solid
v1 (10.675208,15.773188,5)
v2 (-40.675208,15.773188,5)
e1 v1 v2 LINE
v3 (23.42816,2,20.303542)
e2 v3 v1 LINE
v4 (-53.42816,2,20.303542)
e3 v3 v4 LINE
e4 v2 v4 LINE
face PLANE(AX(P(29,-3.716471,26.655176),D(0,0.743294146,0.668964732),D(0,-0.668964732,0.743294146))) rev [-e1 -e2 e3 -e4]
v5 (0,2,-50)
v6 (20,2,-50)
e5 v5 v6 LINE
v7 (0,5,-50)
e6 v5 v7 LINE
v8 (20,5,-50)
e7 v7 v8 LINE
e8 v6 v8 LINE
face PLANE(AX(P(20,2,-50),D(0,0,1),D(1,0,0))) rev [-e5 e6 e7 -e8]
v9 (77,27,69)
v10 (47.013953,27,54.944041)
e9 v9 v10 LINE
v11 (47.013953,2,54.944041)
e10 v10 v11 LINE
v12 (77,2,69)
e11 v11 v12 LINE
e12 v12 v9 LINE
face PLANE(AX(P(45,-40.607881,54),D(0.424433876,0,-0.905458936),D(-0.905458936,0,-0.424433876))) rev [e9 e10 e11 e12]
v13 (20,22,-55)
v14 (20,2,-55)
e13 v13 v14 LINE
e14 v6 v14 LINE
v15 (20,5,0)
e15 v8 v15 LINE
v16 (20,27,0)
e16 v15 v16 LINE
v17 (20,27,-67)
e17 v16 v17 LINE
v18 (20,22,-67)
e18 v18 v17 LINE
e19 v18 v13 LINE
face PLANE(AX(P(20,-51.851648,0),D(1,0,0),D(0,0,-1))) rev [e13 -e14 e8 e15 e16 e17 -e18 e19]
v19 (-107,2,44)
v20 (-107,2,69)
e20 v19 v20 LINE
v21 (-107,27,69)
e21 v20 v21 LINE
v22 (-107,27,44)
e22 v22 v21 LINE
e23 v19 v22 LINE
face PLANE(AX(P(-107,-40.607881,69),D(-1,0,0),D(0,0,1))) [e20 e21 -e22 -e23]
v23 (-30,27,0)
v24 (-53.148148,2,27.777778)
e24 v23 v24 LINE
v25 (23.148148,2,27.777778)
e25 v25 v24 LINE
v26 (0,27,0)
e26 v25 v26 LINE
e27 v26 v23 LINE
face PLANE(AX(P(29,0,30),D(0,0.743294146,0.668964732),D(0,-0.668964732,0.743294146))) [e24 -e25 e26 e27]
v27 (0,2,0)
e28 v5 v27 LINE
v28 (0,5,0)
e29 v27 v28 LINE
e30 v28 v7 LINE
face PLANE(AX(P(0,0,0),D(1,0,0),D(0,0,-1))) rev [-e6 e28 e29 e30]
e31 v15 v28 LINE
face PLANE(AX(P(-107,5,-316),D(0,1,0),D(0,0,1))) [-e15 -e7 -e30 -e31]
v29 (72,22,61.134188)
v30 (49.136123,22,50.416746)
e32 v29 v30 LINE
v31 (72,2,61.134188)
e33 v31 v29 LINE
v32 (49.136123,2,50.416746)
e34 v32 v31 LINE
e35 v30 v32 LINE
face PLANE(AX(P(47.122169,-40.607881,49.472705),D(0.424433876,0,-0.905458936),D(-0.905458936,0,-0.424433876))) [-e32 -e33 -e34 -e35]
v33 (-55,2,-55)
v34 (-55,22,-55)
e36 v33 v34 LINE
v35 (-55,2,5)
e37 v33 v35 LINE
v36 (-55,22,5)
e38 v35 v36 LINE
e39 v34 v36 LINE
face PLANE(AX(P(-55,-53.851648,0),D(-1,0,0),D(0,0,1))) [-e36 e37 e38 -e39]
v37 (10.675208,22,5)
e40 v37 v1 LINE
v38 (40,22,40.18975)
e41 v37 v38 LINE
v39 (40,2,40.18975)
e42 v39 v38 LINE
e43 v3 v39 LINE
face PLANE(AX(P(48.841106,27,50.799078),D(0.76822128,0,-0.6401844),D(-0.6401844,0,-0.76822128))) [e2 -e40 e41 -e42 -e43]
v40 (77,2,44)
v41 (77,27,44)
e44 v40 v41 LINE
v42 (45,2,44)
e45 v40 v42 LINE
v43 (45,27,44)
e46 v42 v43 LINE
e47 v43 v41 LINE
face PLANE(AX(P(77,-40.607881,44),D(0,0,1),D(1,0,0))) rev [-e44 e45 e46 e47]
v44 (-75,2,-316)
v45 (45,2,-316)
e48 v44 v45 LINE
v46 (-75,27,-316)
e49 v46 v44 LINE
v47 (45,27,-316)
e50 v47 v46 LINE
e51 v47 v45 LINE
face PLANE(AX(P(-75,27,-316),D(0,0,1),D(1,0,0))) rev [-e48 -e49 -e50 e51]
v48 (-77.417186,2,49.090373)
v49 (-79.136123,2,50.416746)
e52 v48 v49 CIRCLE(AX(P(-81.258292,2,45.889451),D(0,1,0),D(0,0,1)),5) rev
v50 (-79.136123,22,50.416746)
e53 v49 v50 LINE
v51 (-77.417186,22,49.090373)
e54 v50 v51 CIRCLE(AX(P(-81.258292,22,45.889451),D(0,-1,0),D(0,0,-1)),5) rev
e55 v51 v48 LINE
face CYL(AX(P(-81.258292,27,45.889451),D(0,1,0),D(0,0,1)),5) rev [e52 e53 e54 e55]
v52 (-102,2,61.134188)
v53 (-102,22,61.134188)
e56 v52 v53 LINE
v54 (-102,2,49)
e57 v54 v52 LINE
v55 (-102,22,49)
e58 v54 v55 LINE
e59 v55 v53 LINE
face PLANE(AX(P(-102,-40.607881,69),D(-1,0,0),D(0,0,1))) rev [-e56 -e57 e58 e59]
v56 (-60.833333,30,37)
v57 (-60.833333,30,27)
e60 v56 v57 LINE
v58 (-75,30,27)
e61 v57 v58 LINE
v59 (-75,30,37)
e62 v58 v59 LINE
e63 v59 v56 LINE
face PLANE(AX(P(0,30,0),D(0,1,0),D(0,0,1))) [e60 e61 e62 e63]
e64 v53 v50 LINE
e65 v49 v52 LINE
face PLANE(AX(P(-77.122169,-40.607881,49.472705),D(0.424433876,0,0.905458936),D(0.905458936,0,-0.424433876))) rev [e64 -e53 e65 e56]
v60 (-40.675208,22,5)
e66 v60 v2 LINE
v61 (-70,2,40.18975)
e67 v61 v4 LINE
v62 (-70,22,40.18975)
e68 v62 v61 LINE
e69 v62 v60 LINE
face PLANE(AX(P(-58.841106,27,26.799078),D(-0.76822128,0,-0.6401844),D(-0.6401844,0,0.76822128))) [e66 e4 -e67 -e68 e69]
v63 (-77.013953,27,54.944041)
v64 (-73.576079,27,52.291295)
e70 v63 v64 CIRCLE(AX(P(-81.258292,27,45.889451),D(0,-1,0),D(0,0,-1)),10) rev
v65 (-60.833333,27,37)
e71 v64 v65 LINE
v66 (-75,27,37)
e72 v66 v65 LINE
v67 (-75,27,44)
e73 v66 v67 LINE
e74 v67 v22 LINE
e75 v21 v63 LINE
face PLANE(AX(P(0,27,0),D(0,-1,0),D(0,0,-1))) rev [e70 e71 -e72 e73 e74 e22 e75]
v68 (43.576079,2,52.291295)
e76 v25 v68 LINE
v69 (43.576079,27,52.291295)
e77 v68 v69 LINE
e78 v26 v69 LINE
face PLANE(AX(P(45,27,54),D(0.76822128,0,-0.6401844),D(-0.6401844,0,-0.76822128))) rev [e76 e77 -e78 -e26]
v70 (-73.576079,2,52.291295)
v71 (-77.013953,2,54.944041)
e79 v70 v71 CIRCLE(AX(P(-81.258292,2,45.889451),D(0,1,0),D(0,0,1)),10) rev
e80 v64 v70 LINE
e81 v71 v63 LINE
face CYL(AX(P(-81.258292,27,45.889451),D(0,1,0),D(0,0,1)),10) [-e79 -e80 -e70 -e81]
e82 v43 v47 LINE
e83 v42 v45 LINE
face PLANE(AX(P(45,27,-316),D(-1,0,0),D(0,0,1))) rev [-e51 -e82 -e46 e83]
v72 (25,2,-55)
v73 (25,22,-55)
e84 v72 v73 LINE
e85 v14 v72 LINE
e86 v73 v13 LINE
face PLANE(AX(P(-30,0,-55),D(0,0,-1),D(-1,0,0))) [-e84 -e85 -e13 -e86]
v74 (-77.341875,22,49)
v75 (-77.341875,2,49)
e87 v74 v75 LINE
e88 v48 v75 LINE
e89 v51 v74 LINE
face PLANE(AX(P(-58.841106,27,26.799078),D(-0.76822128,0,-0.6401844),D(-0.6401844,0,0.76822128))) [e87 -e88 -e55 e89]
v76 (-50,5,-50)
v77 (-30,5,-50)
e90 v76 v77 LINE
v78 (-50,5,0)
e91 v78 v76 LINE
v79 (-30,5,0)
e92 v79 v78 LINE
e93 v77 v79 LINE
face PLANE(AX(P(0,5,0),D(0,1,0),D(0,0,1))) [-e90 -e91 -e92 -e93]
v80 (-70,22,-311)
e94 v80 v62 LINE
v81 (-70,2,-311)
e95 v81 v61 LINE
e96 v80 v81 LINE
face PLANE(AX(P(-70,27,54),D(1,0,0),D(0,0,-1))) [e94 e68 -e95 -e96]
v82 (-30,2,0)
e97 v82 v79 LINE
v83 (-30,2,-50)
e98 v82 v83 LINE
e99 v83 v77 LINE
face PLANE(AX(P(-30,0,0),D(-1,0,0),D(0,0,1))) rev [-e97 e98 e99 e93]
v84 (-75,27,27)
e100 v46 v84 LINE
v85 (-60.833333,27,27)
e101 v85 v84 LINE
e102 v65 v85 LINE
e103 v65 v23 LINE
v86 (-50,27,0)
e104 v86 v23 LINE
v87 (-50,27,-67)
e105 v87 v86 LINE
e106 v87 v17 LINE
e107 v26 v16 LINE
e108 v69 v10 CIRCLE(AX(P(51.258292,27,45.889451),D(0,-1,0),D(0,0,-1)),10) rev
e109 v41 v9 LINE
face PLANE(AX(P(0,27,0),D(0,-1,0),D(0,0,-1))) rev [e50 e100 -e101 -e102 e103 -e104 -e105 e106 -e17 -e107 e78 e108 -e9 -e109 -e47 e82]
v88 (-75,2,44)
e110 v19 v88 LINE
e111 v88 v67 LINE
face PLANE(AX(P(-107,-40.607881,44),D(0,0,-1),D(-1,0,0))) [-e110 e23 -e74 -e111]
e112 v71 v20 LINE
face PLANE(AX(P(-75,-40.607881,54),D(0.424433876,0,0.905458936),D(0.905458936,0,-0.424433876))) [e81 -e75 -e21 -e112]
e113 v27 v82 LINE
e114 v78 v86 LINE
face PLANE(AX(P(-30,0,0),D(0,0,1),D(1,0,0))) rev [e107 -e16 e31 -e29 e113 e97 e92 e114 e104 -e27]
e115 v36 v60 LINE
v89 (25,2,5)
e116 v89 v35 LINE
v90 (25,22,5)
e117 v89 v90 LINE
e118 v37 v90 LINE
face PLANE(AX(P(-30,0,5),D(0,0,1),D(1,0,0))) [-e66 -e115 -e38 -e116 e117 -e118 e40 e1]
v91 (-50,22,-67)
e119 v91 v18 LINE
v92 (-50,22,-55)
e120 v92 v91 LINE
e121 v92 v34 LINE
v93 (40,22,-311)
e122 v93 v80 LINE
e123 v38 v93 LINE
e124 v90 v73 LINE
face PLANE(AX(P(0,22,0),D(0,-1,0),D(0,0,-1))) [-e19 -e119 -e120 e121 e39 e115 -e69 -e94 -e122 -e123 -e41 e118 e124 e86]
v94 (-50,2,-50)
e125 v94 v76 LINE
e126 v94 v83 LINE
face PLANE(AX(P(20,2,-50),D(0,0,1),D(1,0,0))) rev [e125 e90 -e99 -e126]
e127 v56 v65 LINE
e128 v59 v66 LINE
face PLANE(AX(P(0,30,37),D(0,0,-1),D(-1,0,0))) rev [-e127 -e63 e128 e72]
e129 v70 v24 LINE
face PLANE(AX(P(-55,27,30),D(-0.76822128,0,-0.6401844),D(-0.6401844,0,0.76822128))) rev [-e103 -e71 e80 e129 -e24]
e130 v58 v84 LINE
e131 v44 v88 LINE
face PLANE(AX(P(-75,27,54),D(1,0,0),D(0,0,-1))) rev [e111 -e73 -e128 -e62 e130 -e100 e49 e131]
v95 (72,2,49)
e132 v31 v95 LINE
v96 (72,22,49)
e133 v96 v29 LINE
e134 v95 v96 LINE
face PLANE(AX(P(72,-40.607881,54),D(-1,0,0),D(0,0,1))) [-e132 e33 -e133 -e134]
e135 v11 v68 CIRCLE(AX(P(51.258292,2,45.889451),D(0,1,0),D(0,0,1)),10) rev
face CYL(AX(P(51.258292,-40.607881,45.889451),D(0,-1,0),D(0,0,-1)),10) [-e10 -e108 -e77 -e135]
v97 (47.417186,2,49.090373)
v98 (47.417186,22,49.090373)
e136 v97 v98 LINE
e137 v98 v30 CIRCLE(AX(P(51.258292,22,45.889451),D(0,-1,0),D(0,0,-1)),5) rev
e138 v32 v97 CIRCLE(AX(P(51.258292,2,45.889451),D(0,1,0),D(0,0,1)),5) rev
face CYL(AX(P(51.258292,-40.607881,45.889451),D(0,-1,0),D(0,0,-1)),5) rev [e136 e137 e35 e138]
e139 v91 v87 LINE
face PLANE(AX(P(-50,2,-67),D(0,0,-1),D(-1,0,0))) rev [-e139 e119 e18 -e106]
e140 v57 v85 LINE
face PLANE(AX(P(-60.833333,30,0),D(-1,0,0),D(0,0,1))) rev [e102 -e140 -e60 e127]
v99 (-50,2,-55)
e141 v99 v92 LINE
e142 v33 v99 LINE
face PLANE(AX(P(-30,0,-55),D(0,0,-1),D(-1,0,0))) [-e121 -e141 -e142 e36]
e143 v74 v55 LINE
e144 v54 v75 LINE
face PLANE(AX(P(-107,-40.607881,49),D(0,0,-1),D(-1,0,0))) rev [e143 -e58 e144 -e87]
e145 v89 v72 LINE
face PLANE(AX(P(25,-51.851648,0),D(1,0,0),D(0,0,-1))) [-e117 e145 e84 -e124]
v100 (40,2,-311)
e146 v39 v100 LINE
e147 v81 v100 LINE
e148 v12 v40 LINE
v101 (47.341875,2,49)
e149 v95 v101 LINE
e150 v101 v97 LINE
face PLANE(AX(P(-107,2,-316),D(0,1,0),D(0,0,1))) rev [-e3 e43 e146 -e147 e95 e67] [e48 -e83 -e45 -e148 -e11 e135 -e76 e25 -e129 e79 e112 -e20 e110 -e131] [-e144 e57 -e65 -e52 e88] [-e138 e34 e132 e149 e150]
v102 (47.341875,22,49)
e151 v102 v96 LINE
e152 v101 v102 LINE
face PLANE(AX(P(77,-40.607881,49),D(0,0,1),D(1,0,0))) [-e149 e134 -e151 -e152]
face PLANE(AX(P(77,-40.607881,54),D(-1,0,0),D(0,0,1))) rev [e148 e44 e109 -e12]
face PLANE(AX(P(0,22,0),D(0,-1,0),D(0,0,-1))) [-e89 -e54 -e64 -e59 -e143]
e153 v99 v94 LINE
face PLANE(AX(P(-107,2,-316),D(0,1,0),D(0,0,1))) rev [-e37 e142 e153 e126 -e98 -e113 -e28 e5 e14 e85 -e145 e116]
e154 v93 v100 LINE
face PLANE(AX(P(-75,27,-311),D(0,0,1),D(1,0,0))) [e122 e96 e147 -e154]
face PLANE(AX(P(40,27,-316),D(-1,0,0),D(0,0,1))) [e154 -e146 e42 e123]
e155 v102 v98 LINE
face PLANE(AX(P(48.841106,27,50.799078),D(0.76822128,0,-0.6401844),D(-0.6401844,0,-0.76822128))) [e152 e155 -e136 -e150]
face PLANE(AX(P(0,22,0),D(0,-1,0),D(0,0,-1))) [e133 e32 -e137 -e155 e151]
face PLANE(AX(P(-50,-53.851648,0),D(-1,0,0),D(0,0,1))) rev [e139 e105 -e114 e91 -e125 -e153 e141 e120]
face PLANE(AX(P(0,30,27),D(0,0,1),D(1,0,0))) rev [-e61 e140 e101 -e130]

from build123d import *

# Parameters (mm, degrees)
BOSS_EXTRUDE1_DEPTH      = 27
CUT_EXTRUDE1_DEPTH       = 29
CUT_EXTRUDE1_DEPTH_BACK  = 70
BOSS_EXTRUDE2_DEPTH      = 27
SKETCH9_W                = 14.166666667
SKETCH9_H                = 10
BOSS_EXTRUDE3_DEPTH      = 3
SKETCH10_W               = 30
SKETCH10_H               = 50
CUT_EXTRUDE7_DEPTH       = 326.898757285
SKETCH11_W               = 20
SKETCH11_H               = 50
CUT_EXTRUDE9_DEPTH       = 22
BOSS_EXTRUDE4_DEPTH      = 27
FILLET1_R                = 10
FILLET2_R                = 10
CUT_EXTRUDE10_DEPTH      = 367.89508037
CUT_EXTRUDE10_DEPTH_BACK = 367.89508037
SKETCH17_W               = 385
SKETCH17_H               = 2
SKETCH18_W               = 20
SKETCH18_H               = 50
CUT_EXTRUDE11_DEPTH      = 22
SHELL1_START             = 2
SHELL1_DEPTH             = 20
SHELL1_START_2           = -55
SHELL1_2_DEPTH           = 80
CUT_EXTRUDE12_DEPTH      = 335.559411764
CUT_EXTRUDE12_DEPTH_BACK = 335.559411764
SKETCH20_W               = 70
SKETCH20_H               = 17


with BuildPart() as part:
    # Sketch1 → Boss-Extrude1 (new body)
    with BuildSketch(Plane(origin=(0, 0, 0), x_dir=(1, 0, 0), z_dir=(0, 1, 0))):
        Polygon((-30, 0), (-55, -30), (-15, -30), (-15, 0), align=None)
        Polygon((-15, 0), (-15, -30), (25, -30), (0, 0), align=None)
    extrude(amount=BOSS_EXTRUDE1_DEPTH)

    # Sketch3 → Cut-Extrude1 (cut, two sides: drawn at the far end of the back side and taken through both)
    with BuildSketch(Plane(origin=(0, 0, 0), x_dir=(0, 0, -1), z_dir=(1, 0, 0)).offset(-CUT_EXTRUDE1_DEPTH_BACK)):
        Polygon((-30, 0), (0, 27), (-30, 27), align=None)
    extrude(amount=CUT_EXTRUDE1_DEPTH + CUT_EXTRUDE1_DEPTH_BACK, mode=Mode.SUBTRACT)

    # Sketch5 → Boss-Extrude2 (add)
    with BuildSketch(Plane(origin=(0, 0, 0), x_dir=(1, 0, 0), z_dir=(0, 1, 0))):
        Polygon((-55, -30), (-75, -54), (-75, 316), (45, 316), (45, -54), (25, -30), (0, 0), (-30, 0), align=None)
    extrude(amount=BOSS_EXTRUDE2_DEPTH)

    # Sketch9 → Boss-Extrude3 (add)
    with BuildSketch(Plane(origin=(0, 27, 0), x_dir=(1, 0, 0), z_dir=(0, 1, 0))):
        with Locations((-67.916666667, -32)):
            Rectangle(SKETCH9_W, SKETCH9_H)
    extrude(amount=BOSS_EXTRUDE3_DEPTH)

    # Sketch10 → Cut-Extrude7 (cut, through all)
    with BuildSketch(Plane(origin=(0, 27, 0), x_dir=(1, 0, 0), z_dir=(0, 1, 0))):
        with Locations((-15, 25)):
            Rectangle(SKETCH10_W, SKETCH10_H)
    extrude(amount=-CUT_EXTRUDE7_DEPTH, mode=Mode.SUBTRACT)

    # Sketch11 → Cut-Extrude9 (cut)
    with BuildSketch(Plane(origin=(0, 27, 0), x_dir=(1, 0, 0), z_dir=(0, 1, 0))):
        with Locations((-40, 25)):
            Rectangle(SKETCH11_W, SKETCH11_H)
    extrude(amount=-CUT_EXTRUDE9_DEPTH, mode=Mode.SUBTRACT)

    # Sketch16 → Boss-Extrude4 (add)
    with BuildSketch(Plane(origin=(0, 27, 0), x_dir=(1, 0, 0), z_dir=(0, 1, 0))):
        Polygon((-75, -54), (-107, -69), (-107, -54), (-107, -44), (-75, -44), align=None)
    boss_extrude4 = extrude(amount=-BOSS_EXTRUDE4_DEPTH)

    # Mirror1: Boss-Extrude4 across plane
    add(boss_extrude4.mirror(Plane.ZY.offset(15)))

    # Fillet1
    fillet1_edges = [part.edges().sort_by_distance(p)[0] for p in [
        (-75, 13.5, 54),
    ]]
    fillet(fillet1_edges, radius=FILLET1_R)

    # Fillet2
    fillet2_edges = [part.edges().sort_by_distance(p)[0] for p in [
        (45, 13.5, 54),
    ]]
    fillet(fillet2_edges, radius=FILLET2_R)

    # Sketch17 → Cut-Extrude10 (cut, two sides: drawn at the far end of the back side and taken through both)
    with BuildSketch(Plane(origin=(77, 0, 0), x_dir=(0, 0, -1), z_dir=(1, 0, 0)).offset(-CUT_EXTRUDE10_DEPTH_BACK)):
        with Locations((123.5, 1)):
            Rectangle(SKETCH17_W, SKETCH17_H)
    extrude(amount=CUT_EXTRUDE10_DEPTH + CUT_EXTRUDE10_DEPTH_BACK, mode=Mode.SUBTRACT)

    # Sketch18 → Cut-Extrude11 (cut)
    with BuildSketch(Plane(origin=(0, 27, 0), x_dir=(1, 0, 0), z_dir=(0, 1, 0))):
        with Locations((10, 25)):
            Rectangle(SKETCH18_W, SKETCH18_H)
    extrude(amount=-CUT_EXTRUDE11_DEPTH, mode=Mode.SUBTRACT)

    # Shell1: read off the stored shape, not the designer's step
    # Shell1 outline → Shell1 (cut)
    with BuildSketch(Plane(origin=(0, 0, 0), x_dir=(1, 0, 0), z_dir=(0, 1, 0)).offset(SHELL1_START)):
        Polygon((25, 55), (25, -5), (10.675208063, -5), (40, -40.189750324), (40, 311), (-70, 311), (-70, -40.189750324), (-40.675208063, -5), (-55, -5), (-55, 55), align=None)
        with BuildLine():
            Line((47.34187473, -49), (47.417185838, -49.090373329))
            ThreePointArc((47.417185838, -49.090373329), (48.203790537, -49.847988861), (49.136122855, -50.416746011))
            Line((49.136122855, -50.416746011), (72, -61.134188423))
            Line((72, -61.134188423), (72, -49))
            Line((72, -49), (47.34187473, -49))
        make_face()
        with BuildLine():
            Line((-77.417185838, -49.090373329), (-77.34187473, -49))
            Line((-77.34187473, -49), (-102, -49))
            Line((-102, -49), (-102, -61.134188423))
            Line((-102, -61.134188423), (-79.136122855, -50.416746011))
            ThreePointArc((-79.136122855, -50.416746011), (-78.203790537, -49.847988861), (-77.417185838, -49.090373329))
        make_face()
    extrude(amount=SHELL1_DEPTH, mode=Mode.SUBTRACT)

    # Shell1 2 outline → Shell1 2 (cut)
    with BuildSketch(Plane.YZ.offset(SHELL1_START_2)):
        Polygon((2, 5), (15.773187976, 5), (2, 20.303542196), align=None)
    extrude(amount=SHELL1_2_DEPTH, mode=Mode.SUBTRACT)

    # Sketch20 → Cut-Extrude12 (cut, two sides: drawn at the far end of the back side and taken through both)
    with BuildSketch(Plane(origin=(0, 27, 0), x_dir=(1, 0, 0), z_dir=(0, 1, 0)).offset(-CUT_EXTRUDE12_DEPTH_BACK)):
        with Locations((-15, 58.5)):
            Rectangle(SKETCH20_W, SKETCH20_H)
    extrude(amount=CUT_EXTRUDE12_DEPTH + CUT_EXTRUDE12_DEPTH_BACK, mode=Mode.SUBTRACT)


solid = part.part
